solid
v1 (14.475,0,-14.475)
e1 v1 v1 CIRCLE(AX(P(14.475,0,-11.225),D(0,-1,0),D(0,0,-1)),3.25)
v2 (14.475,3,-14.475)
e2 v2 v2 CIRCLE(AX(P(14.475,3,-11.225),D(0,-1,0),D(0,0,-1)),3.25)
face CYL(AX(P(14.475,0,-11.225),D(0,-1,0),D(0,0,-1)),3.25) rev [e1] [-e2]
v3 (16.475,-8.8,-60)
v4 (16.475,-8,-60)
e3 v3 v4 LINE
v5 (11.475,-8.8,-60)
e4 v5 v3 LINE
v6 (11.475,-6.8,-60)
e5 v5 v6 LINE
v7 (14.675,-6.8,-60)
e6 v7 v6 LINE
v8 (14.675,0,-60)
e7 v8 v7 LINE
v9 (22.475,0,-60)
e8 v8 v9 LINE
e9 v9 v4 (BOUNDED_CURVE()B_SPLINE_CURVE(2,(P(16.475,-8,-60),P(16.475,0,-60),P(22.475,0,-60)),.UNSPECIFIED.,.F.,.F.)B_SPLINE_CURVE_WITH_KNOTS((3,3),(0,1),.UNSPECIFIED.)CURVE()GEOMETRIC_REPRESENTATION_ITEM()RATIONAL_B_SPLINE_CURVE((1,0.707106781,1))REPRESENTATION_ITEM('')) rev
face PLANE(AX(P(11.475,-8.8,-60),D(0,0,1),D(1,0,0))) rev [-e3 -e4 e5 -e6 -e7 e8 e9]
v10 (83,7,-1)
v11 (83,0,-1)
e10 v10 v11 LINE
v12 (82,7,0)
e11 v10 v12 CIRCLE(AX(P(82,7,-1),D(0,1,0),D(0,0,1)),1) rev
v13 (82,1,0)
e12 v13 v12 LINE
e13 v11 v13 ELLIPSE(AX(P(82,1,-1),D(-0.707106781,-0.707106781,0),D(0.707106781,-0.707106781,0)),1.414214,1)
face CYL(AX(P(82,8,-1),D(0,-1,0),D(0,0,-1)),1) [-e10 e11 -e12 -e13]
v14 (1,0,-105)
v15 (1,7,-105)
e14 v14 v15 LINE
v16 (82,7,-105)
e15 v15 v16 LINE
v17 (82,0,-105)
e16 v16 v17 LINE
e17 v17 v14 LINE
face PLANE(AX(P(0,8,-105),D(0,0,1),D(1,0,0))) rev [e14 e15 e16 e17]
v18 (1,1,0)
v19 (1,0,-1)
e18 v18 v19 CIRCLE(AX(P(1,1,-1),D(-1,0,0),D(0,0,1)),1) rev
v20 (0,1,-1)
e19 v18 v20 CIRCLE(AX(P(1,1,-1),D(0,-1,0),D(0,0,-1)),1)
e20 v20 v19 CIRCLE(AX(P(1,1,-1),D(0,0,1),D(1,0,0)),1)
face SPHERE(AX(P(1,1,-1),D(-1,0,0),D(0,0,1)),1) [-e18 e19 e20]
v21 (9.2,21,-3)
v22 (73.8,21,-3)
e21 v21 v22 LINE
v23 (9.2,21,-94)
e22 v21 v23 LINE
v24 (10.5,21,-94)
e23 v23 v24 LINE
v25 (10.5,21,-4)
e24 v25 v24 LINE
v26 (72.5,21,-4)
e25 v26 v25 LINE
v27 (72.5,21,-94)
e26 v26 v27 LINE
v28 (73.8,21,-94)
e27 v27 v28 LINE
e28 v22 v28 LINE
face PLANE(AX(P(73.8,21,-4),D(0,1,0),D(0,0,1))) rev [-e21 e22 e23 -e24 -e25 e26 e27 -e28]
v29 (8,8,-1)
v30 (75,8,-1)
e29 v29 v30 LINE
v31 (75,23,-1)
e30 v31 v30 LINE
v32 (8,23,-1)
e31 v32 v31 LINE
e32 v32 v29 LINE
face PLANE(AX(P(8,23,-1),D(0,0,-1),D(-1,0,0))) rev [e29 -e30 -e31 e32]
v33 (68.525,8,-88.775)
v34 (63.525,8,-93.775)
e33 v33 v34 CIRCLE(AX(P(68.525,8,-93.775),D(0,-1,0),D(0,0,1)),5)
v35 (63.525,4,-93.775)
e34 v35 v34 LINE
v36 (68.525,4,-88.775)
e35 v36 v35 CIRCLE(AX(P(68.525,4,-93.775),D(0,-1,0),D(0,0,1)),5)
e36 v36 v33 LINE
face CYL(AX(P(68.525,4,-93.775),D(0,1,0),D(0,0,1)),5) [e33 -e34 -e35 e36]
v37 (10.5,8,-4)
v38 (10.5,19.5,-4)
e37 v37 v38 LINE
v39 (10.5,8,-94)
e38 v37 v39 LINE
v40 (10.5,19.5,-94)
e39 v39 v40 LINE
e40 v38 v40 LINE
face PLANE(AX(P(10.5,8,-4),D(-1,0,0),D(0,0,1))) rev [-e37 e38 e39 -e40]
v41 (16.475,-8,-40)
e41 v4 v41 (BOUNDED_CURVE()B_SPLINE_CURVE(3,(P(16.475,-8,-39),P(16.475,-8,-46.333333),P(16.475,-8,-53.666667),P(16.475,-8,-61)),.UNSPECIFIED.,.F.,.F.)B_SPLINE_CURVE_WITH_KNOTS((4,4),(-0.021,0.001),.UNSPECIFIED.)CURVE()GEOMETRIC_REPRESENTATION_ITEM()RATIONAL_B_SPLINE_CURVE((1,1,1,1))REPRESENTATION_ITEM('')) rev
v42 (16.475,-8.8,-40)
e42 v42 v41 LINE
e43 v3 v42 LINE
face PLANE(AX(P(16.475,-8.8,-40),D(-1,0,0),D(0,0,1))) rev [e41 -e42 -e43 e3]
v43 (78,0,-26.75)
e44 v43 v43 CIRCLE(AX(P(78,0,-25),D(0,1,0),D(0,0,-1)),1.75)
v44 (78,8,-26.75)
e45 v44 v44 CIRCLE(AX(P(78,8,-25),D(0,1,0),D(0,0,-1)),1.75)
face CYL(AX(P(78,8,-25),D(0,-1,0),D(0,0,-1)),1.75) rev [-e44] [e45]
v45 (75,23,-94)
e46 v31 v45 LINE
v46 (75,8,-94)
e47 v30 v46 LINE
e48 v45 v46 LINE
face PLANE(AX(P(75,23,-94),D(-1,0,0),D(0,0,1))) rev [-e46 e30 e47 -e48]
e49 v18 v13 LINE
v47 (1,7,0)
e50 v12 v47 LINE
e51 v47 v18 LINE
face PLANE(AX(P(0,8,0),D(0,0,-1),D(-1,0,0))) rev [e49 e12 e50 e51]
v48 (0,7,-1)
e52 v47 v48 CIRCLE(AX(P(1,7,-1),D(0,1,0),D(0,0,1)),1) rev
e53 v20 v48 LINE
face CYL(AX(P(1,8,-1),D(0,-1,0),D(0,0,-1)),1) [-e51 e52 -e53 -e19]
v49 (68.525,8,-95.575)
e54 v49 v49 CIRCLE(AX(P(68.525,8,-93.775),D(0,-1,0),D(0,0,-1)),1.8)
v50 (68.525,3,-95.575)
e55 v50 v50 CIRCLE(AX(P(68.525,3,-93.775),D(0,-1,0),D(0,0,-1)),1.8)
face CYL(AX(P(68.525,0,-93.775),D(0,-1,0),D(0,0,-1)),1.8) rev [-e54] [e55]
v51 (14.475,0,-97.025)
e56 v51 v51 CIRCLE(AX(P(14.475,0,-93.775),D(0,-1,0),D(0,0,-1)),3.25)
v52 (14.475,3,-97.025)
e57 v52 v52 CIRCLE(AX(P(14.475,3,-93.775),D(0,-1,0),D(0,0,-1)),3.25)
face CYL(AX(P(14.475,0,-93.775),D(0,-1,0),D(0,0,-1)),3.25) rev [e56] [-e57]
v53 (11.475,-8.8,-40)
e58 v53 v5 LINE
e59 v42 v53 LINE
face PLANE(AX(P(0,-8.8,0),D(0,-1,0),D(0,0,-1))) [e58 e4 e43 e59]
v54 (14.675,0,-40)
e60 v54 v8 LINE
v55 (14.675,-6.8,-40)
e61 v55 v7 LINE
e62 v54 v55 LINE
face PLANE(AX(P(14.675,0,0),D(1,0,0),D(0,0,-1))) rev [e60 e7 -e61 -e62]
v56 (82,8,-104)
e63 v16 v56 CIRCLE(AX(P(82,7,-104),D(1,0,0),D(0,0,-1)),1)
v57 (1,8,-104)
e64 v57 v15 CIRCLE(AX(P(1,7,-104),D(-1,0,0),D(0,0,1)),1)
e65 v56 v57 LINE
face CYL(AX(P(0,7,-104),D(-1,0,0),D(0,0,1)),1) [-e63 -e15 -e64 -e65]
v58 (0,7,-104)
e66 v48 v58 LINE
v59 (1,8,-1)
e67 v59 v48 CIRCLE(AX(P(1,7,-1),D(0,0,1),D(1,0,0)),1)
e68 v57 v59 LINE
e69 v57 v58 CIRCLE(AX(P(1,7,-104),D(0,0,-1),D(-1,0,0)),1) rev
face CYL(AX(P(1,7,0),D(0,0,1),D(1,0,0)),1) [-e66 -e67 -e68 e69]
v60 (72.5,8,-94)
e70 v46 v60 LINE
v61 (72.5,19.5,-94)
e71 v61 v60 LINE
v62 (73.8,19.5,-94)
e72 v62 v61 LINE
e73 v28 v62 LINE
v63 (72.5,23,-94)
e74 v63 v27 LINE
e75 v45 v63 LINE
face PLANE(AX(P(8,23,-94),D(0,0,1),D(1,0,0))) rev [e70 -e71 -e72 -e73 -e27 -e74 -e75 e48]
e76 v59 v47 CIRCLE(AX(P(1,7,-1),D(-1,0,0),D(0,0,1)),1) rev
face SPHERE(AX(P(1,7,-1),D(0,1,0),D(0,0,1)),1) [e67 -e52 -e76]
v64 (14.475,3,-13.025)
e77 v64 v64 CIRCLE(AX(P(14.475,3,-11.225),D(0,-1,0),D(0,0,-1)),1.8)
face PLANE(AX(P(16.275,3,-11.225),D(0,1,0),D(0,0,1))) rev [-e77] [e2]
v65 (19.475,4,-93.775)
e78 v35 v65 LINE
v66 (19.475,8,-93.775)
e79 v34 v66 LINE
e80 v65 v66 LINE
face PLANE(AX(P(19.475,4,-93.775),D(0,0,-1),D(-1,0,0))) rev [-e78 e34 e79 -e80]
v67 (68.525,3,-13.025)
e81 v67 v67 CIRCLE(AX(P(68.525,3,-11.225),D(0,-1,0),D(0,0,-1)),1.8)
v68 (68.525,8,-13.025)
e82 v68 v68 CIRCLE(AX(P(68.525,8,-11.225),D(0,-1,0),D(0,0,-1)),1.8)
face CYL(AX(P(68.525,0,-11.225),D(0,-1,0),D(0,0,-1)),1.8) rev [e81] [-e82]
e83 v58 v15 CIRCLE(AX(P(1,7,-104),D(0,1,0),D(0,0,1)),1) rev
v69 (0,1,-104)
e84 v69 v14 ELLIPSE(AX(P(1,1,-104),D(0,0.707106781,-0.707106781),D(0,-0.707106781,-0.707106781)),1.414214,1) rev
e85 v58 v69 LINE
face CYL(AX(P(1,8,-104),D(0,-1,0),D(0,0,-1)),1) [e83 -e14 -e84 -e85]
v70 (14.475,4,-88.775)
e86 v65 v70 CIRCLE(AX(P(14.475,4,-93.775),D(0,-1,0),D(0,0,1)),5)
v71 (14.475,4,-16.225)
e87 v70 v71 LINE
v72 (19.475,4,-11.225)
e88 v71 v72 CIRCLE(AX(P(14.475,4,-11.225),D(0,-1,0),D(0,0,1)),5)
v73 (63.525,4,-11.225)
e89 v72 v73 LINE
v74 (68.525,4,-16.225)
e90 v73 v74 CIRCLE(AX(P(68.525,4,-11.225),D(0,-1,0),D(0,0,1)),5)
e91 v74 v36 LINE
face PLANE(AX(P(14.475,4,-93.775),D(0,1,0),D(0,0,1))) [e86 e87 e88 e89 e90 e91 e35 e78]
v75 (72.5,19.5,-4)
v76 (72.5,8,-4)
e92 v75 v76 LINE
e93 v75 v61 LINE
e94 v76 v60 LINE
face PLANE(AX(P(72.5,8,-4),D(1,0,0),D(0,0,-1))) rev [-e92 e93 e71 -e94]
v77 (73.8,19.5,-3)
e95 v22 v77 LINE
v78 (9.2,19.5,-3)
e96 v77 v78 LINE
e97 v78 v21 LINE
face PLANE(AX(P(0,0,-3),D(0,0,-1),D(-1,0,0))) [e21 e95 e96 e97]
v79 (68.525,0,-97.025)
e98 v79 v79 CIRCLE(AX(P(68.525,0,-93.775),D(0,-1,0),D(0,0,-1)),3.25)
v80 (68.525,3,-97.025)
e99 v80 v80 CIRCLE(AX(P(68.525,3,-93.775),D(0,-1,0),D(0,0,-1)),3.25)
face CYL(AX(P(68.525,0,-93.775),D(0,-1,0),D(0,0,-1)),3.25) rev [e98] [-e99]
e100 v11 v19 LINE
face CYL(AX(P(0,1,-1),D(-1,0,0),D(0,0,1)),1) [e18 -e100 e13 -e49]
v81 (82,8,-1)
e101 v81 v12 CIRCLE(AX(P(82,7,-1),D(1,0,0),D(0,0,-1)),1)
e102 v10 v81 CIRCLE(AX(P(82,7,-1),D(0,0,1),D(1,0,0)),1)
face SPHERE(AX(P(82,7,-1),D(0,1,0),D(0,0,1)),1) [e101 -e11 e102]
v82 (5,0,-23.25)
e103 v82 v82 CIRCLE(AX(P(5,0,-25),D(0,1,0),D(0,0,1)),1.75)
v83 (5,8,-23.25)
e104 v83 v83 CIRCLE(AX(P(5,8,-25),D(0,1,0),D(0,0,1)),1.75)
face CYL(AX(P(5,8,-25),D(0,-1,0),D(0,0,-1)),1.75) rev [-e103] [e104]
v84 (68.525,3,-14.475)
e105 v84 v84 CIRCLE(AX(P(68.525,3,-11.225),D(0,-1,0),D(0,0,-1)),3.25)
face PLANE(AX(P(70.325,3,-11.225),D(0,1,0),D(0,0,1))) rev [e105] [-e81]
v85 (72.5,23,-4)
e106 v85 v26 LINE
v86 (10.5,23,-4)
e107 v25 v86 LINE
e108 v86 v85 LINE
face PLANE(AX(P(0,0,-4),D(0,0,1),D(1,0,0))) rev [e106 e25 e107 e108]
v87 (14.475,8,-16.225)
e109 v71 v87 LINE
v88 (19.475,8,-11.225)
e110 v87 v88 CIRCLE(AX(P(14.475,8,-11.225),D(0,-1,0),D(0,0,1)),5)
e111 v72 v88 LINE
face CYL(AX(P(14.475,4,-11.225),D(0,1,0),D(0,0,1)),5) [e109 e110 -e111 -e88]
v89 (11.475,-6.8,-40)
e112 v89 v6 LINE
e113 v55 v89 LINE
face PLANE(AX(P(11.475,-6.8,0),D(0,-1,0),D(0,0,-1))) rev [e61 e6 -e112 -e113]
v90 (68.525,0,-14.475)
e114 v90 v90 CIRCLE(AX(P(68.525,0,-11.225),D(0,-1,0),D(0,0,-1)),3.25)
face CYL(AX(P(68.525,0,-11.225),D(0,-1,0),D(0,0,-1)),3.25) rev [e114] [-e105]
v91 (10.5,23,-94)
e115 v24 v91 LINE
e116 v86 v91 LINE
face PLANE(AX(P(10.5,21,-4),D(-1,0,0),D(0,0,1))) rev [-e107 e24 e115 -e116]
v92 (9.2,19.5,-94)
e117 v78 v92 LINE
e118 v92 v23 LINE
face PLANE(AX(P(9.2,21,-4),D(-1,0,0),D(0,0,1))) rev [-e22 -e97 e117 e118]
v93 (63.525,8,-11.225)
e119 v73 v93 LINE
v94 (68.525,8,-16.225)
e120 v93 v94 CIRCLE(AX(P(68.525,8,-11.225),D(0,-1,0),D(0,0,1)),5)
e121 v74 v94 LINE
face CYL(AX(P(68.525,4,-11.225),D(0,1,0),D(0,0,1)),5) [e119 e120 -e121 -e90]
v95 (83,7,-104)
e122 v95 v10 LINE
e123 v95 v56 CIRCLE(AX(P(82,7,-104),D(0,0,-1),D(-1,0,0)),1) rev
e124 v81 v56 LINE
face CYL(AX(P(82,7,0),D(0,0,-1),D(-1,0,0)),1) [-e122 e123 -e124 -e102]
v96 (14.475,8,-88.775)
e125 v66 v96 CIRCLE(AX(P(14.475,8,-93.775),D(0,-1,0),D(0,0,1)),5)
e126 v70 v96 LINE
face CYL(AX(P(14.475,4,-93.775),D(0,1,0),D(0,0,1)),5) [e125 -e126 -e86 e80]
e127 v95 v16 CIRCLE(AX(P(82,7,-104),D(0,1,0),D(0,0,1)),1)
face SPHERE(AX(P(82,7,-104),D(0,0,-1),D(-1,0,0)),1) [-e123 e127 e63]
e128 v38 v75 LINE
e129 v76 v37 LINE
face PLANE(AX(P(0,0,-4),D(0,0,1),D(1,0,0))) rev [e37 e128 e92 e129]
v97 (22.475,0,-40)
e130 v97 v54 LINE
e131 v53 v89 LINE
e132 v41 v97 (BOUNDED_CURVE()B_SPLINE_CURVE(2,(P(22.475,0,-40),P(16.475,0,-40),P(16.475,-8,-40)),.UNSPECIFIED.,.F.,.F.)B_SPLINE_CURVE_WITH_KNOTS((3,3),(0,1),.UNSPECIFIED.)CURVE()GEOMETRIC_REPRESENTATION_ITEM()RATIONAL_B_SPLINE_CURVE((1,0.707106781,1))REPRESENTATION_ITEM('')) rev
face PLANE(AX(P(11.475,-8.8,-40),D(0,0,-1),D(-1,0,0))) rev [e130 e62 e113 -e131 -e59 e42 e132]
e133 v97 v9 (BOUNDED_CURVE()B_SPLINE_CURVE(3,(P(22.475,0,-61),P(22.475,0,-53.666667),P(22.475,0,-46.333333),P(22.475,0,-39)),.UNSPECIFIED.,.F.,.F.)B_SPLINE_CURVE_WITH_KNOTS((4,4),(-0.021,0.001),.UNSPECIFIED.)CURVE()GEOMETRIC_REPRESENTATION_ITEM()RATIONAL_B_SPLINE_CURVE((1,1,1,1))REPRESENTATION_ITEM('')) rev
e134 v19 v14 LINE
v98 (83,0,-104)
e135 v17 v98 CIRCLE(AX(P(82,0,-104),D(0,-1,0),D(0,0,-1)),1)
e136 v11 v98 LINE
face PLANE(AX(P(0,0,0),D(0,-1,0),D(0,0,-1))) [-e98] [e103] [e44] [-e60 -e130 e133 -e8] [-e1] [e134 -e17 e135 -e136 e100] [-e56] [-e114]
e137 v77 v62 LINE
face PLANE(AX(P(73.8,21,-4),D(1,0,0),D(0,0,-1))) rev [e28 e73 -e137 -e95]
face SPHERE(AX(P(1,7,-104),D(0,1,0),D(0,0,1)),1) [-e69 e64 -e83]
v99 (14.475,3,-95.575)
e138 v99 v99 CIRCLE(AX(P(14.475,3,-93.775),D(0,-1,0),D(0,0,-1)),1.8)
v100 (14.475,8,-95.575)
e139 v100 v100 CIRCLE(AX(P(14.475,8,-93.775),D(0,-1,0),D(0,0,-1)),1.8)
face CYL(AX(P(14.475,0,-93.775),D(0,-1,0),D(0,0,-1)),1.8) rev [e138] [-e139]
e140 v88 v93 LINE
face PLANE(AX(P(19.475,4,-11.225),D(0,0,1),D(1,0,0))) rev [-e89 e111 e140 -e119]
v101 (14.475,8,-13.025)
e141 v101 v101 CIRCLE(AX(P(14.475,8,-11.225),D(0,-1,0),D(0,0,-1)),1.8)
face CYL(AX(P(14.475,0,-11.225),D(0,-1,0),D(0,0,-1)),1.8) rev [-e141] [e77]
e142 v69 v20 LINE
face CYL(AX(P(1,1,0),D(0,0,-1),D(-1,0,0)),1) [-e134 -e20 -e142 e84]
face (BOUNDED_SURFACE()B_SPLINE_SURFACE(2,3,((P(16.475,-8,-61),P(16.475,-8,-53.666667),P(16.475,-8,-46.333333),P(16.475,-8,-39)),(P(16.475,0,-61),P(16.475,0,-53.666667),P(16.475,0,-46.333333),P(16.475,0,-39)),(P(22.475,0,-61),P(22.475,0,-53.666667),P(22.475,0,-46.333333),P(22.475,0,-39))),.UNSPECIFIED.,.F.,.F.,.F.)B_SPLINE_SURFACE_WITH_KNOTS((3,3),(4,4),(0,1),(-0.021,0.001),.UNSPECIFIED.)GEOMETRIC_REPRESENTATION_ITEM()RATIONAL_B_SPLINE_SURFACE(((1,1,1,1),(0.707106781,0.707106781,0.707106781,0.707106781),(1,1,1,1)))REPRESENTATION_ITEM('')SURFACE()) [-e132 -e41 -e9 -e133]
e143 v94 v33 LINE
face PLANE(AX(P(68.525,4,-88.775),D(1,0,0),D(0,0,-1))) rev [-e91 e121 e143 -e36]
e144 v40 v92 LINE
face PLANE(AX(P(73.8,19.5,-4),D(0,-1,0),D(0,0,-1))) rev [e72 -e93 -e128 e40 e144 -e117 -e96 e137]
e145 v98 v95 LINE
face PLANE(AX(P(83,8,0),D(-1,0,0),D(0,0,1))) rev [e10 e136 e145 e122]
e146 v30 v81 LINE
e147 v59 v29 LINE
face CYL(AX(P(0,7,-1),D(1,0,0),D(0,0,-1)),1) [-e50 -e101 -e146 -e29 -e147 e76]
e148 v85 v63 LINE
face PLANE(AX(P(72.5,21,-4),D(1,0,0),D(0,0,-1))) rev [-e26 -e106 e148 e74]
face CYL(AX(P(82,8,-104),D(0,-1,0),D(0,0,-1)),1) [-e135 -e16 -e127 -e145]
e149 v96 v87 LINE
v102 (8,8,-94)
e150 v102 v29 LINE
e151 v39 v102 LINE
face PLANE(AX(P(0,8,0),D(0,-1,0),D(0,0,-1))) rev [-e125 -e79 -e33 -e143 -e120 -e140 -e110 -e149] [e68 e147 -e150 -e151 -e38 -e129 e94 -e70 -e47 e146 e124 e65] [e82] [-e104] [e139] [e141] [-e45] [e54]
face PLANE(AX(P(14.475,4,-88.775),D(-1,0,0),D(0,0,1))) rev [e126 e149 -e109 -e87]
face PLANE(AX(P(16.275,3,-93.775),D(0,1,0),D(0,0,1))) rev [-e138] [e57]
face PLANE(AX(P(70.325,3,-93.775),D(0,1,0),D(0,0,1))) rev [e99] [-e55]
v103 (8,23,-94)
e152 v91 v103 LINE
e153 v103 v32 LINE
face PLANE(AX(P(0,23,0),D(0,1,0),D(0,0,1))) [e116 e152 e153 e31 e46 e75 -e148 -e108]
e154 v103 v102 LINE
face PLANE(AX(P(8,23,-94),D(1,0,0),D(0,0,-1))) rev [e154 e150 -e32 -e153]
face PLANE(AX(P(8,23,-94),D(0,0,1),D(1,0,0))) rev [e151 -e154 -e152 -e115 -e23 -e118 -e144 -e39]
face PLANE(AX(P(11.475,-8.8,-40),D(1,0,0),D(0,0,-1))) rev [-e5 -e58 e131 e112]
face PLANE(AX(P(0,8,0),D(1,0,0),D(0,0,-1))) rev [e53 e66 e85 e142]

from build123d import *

# Parameters (mm, degrees)
SKETCH1_W                      = 83
SKETCH1_H                      = 105
SKETCH1_R                      = 1.75
BOSS_EXTRUDE1_DEPTH            = 8
CBORE_FOR_M3_SHCS1_OUTLINE_R   = 3.25
CBORE_FOR_M3_SHCS1_DEPTH       = 3
CBORE_START                    = 3
CBORE_FOR_M3_SHCS1_2_OUTLINE_R = 1.8
CBORE_FOR_M3_SHCS1_2_DEPTH     = 5
CUT_EXTRUDE1_DEPTH             = 4
SKETCH6_W                      = 5
SKETCH6_H                      = 20
BOSS_EXTRUDE2_DEPTH            = 8.8
SKETCH7_W                      = 3.2
SKETCH7_H                      = 6.8
CUT_EXTRUDE2_DEPTH             = 103.793190436
FILLET1_SIZE                   = 6
FILLET1_SIZE_2                 = 8
FILLET2_R                      = 1
SKETCH8_W                      = 67
SKETCH8_H                      = 93
BOSS_EXTRUDE4_DEPTH            = 15
CUT_EXTRUDE3_DEPTH             = 90
SKETCH12_W                     = 64.6
SKETCH12_H                     = 1.5
CUT_EXTRUDE4_DEPTH             = 1


# Read off the part's stored shape, not the designer's step: CBORE for M3 SHCS1
with BuildPart() as part:
    # Sketch1 → Boss-Extrude1 (new body)
    with BuildSketch(Plane(origin=(0, 0, 0), x_dir=(1, 0, 0), z_dir=(0, 1, 0))):
        with Locations((41.5, 52.5)):
            Rectangle(SKETCH1_W, SKETCH1_H)
        with Locations(Location((5, 25, 0), (0, 0, 270))):
            Circle(SKETCH1_R, mode=Mode.SUBTRACT)
        with Locations(Location((78, 25, 0), (0, 0, 90))):
            Circle(SKETCH1_R, mode=Mode.SUBTRACT)
    extrude(amount=BOSS_EXTRUDE1_DEPTH)

    # CBORE for M3 SHCS1 outline → CBORE for M3 SHCS1 (cut)
    with BuildSketch(Plane(origin=(0, 0, 0), x_dir=(1, 0, 0), z_dir=(0, 1, 0))):
        with Locations((14.475, 93.775)):
            Circle(CBORE_FOR_M3_SHCS1_OUTLINE_R)
        with Locations((68.525, 93.775)):
            Circle(CBORE_FOR_M3_SHCS1_OUTLINE_R)
        with Locations((68.525, 11.225)):
            Circle(CBORE_FOR_M3_SHCS1_OUTLINE_R)
        with Locations((14.475, 11.225)):
            Circle(CBORE_FOR_M3_SHCS1_OUTLINE_R)
    extrude(amount=CBORE_FOR_M3_SHCS1_DEPTH, mode=Mode.SUBTRACT)

    # CBORE for M3 SHCS1 2 outline → CBORE for M3 SHCS1 2 (cut)
    with BuildSketch(Plane(origin=(0, 0, 0), x_dir=(1, 0, 0), z_dir=(0, 1, 0)).offset(CBORE_START)):
        with Locations((14.475, 93.775)):
            Circle(CBORE_FOR_M3_SHCS1_2_OUTLINE_R)
        with Locations((68.525, 93.775)):
            Circle(CBORE_FOR_M3_SHCS1_2_OUTLINE_R)
        with Locations((68.525, 11.225)):
            Circle(CBORE_FOR_M3_SHCS1_2_OUTLINE_R)
        with Locations((14.475, 11.225)):
            Circle(CBORE_FOR_M3_SHCS1_2_OUTLINE_R)
    extrude(amount=CBORE_FOR_M3_SHCS1_2_DEPTH, mode=Mode.SUBTRACT)

    # Sketch5 → Cut-Extrude1 (cut)
    with BuildSketch(Plane(origin=(0, 8, 0), x_dir=(1, 0, 0), z_dir=(0, 1, 0))):
        with BuildLine():
            Line((19.475, 93.775), (63.525, 93.775))
            ThreePointArc((63.525, 93.775), (64.989466094, 90.239466094), (68.525, 88.775))
            Line((68.525, 88.775), (68.525, 16.225))
            ThreePointArc((68.525, 16.225), (64.989466094, 14.760533906), (63.525, 11.225))
            Line((63.525, 11.225), (19.475, 11.225))
            ThreePointArc((19.475, 11.225), (18.010533906, 14.760533906), (14.475, 16.225))
            Line((14.475, 16.225), (14.475, 88.775))
            ThreePointArc((14.475, 88.775), (18.010533906, 90.239466094), (19.475, 93.775))
        make_face()
    extrude(amount=-CUT_EXTRUDE1_DEPTH, mode=Mode.SUBTRACT)

    # Sketch6 → Boss-Extrude2 (add)
    with BuildSketch(Plane.XZ):
        with Locations((13.975, -50)):
            Rectangle(SKETCH6_W, SKETCH6_H)
    extrude(amount=BOSS_EXTRUDE2_DEPTH)

    # Sketch7 → Cut-Extrude2 (cut, through all)
    with BuildSketch(Plane(origin=(0, 0, -60), x_dir=(-1, 0, 0), z_dir=(0, 0, -1))):
        with Locations((-13.075, -3.4)):
            Rectangle(SKETCH7_W, SKETCH7_H)
    extrude(amount=-CUT_EXTRUDE2_DEPTH, mode=Mode.SUBTRACT)

    # Fillet1
    # an asymmetric fillet: 8, 6 mm, written as the material it adds along each edge
    with BuildSketch(Plane(origin=(16.475, 0, -40), x_dir=(1, 0, 0), z_dir=(0, 0, -1))) as fillet1_piece_1:
        with BuildLine():
            Bezier((FILLET1_SIZE, 0), (0, 0), (0, FILLET1_SIZE_2), weights=[1, 0.707106781, 1])
            Line((0, FILLET1_SIZE_2), (0, 0))
            Line((0, 0), (FILLET1_SIZE, 0))
        make_face()
    extrude(amount=20)

    # Fillet2
    fillet2_edges = [part.edges().sort_by_distance(p)[0] for p in [
        (83, 8, -52.5),
        (41.5, 8, -105),
        (0, 8, -52.5),
        (41.5, 0, 0),
        (0, 0, -52.5),
        (0, 4, -105),
        (83, 4, -105),
        (83, 4, 0),
        (0, 4, 0),
        (41.5, 8, 0),
    ]]
    fillet(fillet2_edges, radius=FILLET2_R)

    # Sketch8 → Boss-Extrude4 (add)
    with BuildSketch(Plane(origin=(0, 8, 0), x_dir=(1, 0, 0), z_dir=(0, 1, 0))):
        with Locations((41.5, 47.5)):
            Rectangle(SKETCH8_W, SKETCH8_H)
    extrude(amount=BOSS_EXTRUDE4_DEPTH)

    # Sketch11 → Cut-Extrude3 (cut)
    with BuildSketch(Plane(origin=(0, 0, -94), x_dir=(-1, 0, 0), z_dir=(0, 0, -1))):
        Polygon((-72.5, 8), (-10.5, 8), (-10.5, 19.5), (-9.2, 19.5), (-9.2, 21), (-10.5, 21), (-10.5, 23), (-72.5, 23), (-72.5, 21), (-73.8, 21), (-73.8, 19.5), (-72.5, 19.5), align=None)
    extrude(amount=-CUT_EXTRUDE3_DEPTH, mode=Mode.SUBTRACT)

    # Sketch12 → Cut-Extrude4 (cut)
    with BuildSketch(Plane(origin=(0, 0, -4), x_dir=(-1, 0, 0), z_dir=(0, 0, -1))):
        with Locations((-41.5, 20.25)):
            Rectangle(SKETCH12_W, SKETCH12_H)
    extrude(amount=-CUT_EXTRUDE4_DEPTH, mode=Mode.SUBTRACT)


solid = part.part
